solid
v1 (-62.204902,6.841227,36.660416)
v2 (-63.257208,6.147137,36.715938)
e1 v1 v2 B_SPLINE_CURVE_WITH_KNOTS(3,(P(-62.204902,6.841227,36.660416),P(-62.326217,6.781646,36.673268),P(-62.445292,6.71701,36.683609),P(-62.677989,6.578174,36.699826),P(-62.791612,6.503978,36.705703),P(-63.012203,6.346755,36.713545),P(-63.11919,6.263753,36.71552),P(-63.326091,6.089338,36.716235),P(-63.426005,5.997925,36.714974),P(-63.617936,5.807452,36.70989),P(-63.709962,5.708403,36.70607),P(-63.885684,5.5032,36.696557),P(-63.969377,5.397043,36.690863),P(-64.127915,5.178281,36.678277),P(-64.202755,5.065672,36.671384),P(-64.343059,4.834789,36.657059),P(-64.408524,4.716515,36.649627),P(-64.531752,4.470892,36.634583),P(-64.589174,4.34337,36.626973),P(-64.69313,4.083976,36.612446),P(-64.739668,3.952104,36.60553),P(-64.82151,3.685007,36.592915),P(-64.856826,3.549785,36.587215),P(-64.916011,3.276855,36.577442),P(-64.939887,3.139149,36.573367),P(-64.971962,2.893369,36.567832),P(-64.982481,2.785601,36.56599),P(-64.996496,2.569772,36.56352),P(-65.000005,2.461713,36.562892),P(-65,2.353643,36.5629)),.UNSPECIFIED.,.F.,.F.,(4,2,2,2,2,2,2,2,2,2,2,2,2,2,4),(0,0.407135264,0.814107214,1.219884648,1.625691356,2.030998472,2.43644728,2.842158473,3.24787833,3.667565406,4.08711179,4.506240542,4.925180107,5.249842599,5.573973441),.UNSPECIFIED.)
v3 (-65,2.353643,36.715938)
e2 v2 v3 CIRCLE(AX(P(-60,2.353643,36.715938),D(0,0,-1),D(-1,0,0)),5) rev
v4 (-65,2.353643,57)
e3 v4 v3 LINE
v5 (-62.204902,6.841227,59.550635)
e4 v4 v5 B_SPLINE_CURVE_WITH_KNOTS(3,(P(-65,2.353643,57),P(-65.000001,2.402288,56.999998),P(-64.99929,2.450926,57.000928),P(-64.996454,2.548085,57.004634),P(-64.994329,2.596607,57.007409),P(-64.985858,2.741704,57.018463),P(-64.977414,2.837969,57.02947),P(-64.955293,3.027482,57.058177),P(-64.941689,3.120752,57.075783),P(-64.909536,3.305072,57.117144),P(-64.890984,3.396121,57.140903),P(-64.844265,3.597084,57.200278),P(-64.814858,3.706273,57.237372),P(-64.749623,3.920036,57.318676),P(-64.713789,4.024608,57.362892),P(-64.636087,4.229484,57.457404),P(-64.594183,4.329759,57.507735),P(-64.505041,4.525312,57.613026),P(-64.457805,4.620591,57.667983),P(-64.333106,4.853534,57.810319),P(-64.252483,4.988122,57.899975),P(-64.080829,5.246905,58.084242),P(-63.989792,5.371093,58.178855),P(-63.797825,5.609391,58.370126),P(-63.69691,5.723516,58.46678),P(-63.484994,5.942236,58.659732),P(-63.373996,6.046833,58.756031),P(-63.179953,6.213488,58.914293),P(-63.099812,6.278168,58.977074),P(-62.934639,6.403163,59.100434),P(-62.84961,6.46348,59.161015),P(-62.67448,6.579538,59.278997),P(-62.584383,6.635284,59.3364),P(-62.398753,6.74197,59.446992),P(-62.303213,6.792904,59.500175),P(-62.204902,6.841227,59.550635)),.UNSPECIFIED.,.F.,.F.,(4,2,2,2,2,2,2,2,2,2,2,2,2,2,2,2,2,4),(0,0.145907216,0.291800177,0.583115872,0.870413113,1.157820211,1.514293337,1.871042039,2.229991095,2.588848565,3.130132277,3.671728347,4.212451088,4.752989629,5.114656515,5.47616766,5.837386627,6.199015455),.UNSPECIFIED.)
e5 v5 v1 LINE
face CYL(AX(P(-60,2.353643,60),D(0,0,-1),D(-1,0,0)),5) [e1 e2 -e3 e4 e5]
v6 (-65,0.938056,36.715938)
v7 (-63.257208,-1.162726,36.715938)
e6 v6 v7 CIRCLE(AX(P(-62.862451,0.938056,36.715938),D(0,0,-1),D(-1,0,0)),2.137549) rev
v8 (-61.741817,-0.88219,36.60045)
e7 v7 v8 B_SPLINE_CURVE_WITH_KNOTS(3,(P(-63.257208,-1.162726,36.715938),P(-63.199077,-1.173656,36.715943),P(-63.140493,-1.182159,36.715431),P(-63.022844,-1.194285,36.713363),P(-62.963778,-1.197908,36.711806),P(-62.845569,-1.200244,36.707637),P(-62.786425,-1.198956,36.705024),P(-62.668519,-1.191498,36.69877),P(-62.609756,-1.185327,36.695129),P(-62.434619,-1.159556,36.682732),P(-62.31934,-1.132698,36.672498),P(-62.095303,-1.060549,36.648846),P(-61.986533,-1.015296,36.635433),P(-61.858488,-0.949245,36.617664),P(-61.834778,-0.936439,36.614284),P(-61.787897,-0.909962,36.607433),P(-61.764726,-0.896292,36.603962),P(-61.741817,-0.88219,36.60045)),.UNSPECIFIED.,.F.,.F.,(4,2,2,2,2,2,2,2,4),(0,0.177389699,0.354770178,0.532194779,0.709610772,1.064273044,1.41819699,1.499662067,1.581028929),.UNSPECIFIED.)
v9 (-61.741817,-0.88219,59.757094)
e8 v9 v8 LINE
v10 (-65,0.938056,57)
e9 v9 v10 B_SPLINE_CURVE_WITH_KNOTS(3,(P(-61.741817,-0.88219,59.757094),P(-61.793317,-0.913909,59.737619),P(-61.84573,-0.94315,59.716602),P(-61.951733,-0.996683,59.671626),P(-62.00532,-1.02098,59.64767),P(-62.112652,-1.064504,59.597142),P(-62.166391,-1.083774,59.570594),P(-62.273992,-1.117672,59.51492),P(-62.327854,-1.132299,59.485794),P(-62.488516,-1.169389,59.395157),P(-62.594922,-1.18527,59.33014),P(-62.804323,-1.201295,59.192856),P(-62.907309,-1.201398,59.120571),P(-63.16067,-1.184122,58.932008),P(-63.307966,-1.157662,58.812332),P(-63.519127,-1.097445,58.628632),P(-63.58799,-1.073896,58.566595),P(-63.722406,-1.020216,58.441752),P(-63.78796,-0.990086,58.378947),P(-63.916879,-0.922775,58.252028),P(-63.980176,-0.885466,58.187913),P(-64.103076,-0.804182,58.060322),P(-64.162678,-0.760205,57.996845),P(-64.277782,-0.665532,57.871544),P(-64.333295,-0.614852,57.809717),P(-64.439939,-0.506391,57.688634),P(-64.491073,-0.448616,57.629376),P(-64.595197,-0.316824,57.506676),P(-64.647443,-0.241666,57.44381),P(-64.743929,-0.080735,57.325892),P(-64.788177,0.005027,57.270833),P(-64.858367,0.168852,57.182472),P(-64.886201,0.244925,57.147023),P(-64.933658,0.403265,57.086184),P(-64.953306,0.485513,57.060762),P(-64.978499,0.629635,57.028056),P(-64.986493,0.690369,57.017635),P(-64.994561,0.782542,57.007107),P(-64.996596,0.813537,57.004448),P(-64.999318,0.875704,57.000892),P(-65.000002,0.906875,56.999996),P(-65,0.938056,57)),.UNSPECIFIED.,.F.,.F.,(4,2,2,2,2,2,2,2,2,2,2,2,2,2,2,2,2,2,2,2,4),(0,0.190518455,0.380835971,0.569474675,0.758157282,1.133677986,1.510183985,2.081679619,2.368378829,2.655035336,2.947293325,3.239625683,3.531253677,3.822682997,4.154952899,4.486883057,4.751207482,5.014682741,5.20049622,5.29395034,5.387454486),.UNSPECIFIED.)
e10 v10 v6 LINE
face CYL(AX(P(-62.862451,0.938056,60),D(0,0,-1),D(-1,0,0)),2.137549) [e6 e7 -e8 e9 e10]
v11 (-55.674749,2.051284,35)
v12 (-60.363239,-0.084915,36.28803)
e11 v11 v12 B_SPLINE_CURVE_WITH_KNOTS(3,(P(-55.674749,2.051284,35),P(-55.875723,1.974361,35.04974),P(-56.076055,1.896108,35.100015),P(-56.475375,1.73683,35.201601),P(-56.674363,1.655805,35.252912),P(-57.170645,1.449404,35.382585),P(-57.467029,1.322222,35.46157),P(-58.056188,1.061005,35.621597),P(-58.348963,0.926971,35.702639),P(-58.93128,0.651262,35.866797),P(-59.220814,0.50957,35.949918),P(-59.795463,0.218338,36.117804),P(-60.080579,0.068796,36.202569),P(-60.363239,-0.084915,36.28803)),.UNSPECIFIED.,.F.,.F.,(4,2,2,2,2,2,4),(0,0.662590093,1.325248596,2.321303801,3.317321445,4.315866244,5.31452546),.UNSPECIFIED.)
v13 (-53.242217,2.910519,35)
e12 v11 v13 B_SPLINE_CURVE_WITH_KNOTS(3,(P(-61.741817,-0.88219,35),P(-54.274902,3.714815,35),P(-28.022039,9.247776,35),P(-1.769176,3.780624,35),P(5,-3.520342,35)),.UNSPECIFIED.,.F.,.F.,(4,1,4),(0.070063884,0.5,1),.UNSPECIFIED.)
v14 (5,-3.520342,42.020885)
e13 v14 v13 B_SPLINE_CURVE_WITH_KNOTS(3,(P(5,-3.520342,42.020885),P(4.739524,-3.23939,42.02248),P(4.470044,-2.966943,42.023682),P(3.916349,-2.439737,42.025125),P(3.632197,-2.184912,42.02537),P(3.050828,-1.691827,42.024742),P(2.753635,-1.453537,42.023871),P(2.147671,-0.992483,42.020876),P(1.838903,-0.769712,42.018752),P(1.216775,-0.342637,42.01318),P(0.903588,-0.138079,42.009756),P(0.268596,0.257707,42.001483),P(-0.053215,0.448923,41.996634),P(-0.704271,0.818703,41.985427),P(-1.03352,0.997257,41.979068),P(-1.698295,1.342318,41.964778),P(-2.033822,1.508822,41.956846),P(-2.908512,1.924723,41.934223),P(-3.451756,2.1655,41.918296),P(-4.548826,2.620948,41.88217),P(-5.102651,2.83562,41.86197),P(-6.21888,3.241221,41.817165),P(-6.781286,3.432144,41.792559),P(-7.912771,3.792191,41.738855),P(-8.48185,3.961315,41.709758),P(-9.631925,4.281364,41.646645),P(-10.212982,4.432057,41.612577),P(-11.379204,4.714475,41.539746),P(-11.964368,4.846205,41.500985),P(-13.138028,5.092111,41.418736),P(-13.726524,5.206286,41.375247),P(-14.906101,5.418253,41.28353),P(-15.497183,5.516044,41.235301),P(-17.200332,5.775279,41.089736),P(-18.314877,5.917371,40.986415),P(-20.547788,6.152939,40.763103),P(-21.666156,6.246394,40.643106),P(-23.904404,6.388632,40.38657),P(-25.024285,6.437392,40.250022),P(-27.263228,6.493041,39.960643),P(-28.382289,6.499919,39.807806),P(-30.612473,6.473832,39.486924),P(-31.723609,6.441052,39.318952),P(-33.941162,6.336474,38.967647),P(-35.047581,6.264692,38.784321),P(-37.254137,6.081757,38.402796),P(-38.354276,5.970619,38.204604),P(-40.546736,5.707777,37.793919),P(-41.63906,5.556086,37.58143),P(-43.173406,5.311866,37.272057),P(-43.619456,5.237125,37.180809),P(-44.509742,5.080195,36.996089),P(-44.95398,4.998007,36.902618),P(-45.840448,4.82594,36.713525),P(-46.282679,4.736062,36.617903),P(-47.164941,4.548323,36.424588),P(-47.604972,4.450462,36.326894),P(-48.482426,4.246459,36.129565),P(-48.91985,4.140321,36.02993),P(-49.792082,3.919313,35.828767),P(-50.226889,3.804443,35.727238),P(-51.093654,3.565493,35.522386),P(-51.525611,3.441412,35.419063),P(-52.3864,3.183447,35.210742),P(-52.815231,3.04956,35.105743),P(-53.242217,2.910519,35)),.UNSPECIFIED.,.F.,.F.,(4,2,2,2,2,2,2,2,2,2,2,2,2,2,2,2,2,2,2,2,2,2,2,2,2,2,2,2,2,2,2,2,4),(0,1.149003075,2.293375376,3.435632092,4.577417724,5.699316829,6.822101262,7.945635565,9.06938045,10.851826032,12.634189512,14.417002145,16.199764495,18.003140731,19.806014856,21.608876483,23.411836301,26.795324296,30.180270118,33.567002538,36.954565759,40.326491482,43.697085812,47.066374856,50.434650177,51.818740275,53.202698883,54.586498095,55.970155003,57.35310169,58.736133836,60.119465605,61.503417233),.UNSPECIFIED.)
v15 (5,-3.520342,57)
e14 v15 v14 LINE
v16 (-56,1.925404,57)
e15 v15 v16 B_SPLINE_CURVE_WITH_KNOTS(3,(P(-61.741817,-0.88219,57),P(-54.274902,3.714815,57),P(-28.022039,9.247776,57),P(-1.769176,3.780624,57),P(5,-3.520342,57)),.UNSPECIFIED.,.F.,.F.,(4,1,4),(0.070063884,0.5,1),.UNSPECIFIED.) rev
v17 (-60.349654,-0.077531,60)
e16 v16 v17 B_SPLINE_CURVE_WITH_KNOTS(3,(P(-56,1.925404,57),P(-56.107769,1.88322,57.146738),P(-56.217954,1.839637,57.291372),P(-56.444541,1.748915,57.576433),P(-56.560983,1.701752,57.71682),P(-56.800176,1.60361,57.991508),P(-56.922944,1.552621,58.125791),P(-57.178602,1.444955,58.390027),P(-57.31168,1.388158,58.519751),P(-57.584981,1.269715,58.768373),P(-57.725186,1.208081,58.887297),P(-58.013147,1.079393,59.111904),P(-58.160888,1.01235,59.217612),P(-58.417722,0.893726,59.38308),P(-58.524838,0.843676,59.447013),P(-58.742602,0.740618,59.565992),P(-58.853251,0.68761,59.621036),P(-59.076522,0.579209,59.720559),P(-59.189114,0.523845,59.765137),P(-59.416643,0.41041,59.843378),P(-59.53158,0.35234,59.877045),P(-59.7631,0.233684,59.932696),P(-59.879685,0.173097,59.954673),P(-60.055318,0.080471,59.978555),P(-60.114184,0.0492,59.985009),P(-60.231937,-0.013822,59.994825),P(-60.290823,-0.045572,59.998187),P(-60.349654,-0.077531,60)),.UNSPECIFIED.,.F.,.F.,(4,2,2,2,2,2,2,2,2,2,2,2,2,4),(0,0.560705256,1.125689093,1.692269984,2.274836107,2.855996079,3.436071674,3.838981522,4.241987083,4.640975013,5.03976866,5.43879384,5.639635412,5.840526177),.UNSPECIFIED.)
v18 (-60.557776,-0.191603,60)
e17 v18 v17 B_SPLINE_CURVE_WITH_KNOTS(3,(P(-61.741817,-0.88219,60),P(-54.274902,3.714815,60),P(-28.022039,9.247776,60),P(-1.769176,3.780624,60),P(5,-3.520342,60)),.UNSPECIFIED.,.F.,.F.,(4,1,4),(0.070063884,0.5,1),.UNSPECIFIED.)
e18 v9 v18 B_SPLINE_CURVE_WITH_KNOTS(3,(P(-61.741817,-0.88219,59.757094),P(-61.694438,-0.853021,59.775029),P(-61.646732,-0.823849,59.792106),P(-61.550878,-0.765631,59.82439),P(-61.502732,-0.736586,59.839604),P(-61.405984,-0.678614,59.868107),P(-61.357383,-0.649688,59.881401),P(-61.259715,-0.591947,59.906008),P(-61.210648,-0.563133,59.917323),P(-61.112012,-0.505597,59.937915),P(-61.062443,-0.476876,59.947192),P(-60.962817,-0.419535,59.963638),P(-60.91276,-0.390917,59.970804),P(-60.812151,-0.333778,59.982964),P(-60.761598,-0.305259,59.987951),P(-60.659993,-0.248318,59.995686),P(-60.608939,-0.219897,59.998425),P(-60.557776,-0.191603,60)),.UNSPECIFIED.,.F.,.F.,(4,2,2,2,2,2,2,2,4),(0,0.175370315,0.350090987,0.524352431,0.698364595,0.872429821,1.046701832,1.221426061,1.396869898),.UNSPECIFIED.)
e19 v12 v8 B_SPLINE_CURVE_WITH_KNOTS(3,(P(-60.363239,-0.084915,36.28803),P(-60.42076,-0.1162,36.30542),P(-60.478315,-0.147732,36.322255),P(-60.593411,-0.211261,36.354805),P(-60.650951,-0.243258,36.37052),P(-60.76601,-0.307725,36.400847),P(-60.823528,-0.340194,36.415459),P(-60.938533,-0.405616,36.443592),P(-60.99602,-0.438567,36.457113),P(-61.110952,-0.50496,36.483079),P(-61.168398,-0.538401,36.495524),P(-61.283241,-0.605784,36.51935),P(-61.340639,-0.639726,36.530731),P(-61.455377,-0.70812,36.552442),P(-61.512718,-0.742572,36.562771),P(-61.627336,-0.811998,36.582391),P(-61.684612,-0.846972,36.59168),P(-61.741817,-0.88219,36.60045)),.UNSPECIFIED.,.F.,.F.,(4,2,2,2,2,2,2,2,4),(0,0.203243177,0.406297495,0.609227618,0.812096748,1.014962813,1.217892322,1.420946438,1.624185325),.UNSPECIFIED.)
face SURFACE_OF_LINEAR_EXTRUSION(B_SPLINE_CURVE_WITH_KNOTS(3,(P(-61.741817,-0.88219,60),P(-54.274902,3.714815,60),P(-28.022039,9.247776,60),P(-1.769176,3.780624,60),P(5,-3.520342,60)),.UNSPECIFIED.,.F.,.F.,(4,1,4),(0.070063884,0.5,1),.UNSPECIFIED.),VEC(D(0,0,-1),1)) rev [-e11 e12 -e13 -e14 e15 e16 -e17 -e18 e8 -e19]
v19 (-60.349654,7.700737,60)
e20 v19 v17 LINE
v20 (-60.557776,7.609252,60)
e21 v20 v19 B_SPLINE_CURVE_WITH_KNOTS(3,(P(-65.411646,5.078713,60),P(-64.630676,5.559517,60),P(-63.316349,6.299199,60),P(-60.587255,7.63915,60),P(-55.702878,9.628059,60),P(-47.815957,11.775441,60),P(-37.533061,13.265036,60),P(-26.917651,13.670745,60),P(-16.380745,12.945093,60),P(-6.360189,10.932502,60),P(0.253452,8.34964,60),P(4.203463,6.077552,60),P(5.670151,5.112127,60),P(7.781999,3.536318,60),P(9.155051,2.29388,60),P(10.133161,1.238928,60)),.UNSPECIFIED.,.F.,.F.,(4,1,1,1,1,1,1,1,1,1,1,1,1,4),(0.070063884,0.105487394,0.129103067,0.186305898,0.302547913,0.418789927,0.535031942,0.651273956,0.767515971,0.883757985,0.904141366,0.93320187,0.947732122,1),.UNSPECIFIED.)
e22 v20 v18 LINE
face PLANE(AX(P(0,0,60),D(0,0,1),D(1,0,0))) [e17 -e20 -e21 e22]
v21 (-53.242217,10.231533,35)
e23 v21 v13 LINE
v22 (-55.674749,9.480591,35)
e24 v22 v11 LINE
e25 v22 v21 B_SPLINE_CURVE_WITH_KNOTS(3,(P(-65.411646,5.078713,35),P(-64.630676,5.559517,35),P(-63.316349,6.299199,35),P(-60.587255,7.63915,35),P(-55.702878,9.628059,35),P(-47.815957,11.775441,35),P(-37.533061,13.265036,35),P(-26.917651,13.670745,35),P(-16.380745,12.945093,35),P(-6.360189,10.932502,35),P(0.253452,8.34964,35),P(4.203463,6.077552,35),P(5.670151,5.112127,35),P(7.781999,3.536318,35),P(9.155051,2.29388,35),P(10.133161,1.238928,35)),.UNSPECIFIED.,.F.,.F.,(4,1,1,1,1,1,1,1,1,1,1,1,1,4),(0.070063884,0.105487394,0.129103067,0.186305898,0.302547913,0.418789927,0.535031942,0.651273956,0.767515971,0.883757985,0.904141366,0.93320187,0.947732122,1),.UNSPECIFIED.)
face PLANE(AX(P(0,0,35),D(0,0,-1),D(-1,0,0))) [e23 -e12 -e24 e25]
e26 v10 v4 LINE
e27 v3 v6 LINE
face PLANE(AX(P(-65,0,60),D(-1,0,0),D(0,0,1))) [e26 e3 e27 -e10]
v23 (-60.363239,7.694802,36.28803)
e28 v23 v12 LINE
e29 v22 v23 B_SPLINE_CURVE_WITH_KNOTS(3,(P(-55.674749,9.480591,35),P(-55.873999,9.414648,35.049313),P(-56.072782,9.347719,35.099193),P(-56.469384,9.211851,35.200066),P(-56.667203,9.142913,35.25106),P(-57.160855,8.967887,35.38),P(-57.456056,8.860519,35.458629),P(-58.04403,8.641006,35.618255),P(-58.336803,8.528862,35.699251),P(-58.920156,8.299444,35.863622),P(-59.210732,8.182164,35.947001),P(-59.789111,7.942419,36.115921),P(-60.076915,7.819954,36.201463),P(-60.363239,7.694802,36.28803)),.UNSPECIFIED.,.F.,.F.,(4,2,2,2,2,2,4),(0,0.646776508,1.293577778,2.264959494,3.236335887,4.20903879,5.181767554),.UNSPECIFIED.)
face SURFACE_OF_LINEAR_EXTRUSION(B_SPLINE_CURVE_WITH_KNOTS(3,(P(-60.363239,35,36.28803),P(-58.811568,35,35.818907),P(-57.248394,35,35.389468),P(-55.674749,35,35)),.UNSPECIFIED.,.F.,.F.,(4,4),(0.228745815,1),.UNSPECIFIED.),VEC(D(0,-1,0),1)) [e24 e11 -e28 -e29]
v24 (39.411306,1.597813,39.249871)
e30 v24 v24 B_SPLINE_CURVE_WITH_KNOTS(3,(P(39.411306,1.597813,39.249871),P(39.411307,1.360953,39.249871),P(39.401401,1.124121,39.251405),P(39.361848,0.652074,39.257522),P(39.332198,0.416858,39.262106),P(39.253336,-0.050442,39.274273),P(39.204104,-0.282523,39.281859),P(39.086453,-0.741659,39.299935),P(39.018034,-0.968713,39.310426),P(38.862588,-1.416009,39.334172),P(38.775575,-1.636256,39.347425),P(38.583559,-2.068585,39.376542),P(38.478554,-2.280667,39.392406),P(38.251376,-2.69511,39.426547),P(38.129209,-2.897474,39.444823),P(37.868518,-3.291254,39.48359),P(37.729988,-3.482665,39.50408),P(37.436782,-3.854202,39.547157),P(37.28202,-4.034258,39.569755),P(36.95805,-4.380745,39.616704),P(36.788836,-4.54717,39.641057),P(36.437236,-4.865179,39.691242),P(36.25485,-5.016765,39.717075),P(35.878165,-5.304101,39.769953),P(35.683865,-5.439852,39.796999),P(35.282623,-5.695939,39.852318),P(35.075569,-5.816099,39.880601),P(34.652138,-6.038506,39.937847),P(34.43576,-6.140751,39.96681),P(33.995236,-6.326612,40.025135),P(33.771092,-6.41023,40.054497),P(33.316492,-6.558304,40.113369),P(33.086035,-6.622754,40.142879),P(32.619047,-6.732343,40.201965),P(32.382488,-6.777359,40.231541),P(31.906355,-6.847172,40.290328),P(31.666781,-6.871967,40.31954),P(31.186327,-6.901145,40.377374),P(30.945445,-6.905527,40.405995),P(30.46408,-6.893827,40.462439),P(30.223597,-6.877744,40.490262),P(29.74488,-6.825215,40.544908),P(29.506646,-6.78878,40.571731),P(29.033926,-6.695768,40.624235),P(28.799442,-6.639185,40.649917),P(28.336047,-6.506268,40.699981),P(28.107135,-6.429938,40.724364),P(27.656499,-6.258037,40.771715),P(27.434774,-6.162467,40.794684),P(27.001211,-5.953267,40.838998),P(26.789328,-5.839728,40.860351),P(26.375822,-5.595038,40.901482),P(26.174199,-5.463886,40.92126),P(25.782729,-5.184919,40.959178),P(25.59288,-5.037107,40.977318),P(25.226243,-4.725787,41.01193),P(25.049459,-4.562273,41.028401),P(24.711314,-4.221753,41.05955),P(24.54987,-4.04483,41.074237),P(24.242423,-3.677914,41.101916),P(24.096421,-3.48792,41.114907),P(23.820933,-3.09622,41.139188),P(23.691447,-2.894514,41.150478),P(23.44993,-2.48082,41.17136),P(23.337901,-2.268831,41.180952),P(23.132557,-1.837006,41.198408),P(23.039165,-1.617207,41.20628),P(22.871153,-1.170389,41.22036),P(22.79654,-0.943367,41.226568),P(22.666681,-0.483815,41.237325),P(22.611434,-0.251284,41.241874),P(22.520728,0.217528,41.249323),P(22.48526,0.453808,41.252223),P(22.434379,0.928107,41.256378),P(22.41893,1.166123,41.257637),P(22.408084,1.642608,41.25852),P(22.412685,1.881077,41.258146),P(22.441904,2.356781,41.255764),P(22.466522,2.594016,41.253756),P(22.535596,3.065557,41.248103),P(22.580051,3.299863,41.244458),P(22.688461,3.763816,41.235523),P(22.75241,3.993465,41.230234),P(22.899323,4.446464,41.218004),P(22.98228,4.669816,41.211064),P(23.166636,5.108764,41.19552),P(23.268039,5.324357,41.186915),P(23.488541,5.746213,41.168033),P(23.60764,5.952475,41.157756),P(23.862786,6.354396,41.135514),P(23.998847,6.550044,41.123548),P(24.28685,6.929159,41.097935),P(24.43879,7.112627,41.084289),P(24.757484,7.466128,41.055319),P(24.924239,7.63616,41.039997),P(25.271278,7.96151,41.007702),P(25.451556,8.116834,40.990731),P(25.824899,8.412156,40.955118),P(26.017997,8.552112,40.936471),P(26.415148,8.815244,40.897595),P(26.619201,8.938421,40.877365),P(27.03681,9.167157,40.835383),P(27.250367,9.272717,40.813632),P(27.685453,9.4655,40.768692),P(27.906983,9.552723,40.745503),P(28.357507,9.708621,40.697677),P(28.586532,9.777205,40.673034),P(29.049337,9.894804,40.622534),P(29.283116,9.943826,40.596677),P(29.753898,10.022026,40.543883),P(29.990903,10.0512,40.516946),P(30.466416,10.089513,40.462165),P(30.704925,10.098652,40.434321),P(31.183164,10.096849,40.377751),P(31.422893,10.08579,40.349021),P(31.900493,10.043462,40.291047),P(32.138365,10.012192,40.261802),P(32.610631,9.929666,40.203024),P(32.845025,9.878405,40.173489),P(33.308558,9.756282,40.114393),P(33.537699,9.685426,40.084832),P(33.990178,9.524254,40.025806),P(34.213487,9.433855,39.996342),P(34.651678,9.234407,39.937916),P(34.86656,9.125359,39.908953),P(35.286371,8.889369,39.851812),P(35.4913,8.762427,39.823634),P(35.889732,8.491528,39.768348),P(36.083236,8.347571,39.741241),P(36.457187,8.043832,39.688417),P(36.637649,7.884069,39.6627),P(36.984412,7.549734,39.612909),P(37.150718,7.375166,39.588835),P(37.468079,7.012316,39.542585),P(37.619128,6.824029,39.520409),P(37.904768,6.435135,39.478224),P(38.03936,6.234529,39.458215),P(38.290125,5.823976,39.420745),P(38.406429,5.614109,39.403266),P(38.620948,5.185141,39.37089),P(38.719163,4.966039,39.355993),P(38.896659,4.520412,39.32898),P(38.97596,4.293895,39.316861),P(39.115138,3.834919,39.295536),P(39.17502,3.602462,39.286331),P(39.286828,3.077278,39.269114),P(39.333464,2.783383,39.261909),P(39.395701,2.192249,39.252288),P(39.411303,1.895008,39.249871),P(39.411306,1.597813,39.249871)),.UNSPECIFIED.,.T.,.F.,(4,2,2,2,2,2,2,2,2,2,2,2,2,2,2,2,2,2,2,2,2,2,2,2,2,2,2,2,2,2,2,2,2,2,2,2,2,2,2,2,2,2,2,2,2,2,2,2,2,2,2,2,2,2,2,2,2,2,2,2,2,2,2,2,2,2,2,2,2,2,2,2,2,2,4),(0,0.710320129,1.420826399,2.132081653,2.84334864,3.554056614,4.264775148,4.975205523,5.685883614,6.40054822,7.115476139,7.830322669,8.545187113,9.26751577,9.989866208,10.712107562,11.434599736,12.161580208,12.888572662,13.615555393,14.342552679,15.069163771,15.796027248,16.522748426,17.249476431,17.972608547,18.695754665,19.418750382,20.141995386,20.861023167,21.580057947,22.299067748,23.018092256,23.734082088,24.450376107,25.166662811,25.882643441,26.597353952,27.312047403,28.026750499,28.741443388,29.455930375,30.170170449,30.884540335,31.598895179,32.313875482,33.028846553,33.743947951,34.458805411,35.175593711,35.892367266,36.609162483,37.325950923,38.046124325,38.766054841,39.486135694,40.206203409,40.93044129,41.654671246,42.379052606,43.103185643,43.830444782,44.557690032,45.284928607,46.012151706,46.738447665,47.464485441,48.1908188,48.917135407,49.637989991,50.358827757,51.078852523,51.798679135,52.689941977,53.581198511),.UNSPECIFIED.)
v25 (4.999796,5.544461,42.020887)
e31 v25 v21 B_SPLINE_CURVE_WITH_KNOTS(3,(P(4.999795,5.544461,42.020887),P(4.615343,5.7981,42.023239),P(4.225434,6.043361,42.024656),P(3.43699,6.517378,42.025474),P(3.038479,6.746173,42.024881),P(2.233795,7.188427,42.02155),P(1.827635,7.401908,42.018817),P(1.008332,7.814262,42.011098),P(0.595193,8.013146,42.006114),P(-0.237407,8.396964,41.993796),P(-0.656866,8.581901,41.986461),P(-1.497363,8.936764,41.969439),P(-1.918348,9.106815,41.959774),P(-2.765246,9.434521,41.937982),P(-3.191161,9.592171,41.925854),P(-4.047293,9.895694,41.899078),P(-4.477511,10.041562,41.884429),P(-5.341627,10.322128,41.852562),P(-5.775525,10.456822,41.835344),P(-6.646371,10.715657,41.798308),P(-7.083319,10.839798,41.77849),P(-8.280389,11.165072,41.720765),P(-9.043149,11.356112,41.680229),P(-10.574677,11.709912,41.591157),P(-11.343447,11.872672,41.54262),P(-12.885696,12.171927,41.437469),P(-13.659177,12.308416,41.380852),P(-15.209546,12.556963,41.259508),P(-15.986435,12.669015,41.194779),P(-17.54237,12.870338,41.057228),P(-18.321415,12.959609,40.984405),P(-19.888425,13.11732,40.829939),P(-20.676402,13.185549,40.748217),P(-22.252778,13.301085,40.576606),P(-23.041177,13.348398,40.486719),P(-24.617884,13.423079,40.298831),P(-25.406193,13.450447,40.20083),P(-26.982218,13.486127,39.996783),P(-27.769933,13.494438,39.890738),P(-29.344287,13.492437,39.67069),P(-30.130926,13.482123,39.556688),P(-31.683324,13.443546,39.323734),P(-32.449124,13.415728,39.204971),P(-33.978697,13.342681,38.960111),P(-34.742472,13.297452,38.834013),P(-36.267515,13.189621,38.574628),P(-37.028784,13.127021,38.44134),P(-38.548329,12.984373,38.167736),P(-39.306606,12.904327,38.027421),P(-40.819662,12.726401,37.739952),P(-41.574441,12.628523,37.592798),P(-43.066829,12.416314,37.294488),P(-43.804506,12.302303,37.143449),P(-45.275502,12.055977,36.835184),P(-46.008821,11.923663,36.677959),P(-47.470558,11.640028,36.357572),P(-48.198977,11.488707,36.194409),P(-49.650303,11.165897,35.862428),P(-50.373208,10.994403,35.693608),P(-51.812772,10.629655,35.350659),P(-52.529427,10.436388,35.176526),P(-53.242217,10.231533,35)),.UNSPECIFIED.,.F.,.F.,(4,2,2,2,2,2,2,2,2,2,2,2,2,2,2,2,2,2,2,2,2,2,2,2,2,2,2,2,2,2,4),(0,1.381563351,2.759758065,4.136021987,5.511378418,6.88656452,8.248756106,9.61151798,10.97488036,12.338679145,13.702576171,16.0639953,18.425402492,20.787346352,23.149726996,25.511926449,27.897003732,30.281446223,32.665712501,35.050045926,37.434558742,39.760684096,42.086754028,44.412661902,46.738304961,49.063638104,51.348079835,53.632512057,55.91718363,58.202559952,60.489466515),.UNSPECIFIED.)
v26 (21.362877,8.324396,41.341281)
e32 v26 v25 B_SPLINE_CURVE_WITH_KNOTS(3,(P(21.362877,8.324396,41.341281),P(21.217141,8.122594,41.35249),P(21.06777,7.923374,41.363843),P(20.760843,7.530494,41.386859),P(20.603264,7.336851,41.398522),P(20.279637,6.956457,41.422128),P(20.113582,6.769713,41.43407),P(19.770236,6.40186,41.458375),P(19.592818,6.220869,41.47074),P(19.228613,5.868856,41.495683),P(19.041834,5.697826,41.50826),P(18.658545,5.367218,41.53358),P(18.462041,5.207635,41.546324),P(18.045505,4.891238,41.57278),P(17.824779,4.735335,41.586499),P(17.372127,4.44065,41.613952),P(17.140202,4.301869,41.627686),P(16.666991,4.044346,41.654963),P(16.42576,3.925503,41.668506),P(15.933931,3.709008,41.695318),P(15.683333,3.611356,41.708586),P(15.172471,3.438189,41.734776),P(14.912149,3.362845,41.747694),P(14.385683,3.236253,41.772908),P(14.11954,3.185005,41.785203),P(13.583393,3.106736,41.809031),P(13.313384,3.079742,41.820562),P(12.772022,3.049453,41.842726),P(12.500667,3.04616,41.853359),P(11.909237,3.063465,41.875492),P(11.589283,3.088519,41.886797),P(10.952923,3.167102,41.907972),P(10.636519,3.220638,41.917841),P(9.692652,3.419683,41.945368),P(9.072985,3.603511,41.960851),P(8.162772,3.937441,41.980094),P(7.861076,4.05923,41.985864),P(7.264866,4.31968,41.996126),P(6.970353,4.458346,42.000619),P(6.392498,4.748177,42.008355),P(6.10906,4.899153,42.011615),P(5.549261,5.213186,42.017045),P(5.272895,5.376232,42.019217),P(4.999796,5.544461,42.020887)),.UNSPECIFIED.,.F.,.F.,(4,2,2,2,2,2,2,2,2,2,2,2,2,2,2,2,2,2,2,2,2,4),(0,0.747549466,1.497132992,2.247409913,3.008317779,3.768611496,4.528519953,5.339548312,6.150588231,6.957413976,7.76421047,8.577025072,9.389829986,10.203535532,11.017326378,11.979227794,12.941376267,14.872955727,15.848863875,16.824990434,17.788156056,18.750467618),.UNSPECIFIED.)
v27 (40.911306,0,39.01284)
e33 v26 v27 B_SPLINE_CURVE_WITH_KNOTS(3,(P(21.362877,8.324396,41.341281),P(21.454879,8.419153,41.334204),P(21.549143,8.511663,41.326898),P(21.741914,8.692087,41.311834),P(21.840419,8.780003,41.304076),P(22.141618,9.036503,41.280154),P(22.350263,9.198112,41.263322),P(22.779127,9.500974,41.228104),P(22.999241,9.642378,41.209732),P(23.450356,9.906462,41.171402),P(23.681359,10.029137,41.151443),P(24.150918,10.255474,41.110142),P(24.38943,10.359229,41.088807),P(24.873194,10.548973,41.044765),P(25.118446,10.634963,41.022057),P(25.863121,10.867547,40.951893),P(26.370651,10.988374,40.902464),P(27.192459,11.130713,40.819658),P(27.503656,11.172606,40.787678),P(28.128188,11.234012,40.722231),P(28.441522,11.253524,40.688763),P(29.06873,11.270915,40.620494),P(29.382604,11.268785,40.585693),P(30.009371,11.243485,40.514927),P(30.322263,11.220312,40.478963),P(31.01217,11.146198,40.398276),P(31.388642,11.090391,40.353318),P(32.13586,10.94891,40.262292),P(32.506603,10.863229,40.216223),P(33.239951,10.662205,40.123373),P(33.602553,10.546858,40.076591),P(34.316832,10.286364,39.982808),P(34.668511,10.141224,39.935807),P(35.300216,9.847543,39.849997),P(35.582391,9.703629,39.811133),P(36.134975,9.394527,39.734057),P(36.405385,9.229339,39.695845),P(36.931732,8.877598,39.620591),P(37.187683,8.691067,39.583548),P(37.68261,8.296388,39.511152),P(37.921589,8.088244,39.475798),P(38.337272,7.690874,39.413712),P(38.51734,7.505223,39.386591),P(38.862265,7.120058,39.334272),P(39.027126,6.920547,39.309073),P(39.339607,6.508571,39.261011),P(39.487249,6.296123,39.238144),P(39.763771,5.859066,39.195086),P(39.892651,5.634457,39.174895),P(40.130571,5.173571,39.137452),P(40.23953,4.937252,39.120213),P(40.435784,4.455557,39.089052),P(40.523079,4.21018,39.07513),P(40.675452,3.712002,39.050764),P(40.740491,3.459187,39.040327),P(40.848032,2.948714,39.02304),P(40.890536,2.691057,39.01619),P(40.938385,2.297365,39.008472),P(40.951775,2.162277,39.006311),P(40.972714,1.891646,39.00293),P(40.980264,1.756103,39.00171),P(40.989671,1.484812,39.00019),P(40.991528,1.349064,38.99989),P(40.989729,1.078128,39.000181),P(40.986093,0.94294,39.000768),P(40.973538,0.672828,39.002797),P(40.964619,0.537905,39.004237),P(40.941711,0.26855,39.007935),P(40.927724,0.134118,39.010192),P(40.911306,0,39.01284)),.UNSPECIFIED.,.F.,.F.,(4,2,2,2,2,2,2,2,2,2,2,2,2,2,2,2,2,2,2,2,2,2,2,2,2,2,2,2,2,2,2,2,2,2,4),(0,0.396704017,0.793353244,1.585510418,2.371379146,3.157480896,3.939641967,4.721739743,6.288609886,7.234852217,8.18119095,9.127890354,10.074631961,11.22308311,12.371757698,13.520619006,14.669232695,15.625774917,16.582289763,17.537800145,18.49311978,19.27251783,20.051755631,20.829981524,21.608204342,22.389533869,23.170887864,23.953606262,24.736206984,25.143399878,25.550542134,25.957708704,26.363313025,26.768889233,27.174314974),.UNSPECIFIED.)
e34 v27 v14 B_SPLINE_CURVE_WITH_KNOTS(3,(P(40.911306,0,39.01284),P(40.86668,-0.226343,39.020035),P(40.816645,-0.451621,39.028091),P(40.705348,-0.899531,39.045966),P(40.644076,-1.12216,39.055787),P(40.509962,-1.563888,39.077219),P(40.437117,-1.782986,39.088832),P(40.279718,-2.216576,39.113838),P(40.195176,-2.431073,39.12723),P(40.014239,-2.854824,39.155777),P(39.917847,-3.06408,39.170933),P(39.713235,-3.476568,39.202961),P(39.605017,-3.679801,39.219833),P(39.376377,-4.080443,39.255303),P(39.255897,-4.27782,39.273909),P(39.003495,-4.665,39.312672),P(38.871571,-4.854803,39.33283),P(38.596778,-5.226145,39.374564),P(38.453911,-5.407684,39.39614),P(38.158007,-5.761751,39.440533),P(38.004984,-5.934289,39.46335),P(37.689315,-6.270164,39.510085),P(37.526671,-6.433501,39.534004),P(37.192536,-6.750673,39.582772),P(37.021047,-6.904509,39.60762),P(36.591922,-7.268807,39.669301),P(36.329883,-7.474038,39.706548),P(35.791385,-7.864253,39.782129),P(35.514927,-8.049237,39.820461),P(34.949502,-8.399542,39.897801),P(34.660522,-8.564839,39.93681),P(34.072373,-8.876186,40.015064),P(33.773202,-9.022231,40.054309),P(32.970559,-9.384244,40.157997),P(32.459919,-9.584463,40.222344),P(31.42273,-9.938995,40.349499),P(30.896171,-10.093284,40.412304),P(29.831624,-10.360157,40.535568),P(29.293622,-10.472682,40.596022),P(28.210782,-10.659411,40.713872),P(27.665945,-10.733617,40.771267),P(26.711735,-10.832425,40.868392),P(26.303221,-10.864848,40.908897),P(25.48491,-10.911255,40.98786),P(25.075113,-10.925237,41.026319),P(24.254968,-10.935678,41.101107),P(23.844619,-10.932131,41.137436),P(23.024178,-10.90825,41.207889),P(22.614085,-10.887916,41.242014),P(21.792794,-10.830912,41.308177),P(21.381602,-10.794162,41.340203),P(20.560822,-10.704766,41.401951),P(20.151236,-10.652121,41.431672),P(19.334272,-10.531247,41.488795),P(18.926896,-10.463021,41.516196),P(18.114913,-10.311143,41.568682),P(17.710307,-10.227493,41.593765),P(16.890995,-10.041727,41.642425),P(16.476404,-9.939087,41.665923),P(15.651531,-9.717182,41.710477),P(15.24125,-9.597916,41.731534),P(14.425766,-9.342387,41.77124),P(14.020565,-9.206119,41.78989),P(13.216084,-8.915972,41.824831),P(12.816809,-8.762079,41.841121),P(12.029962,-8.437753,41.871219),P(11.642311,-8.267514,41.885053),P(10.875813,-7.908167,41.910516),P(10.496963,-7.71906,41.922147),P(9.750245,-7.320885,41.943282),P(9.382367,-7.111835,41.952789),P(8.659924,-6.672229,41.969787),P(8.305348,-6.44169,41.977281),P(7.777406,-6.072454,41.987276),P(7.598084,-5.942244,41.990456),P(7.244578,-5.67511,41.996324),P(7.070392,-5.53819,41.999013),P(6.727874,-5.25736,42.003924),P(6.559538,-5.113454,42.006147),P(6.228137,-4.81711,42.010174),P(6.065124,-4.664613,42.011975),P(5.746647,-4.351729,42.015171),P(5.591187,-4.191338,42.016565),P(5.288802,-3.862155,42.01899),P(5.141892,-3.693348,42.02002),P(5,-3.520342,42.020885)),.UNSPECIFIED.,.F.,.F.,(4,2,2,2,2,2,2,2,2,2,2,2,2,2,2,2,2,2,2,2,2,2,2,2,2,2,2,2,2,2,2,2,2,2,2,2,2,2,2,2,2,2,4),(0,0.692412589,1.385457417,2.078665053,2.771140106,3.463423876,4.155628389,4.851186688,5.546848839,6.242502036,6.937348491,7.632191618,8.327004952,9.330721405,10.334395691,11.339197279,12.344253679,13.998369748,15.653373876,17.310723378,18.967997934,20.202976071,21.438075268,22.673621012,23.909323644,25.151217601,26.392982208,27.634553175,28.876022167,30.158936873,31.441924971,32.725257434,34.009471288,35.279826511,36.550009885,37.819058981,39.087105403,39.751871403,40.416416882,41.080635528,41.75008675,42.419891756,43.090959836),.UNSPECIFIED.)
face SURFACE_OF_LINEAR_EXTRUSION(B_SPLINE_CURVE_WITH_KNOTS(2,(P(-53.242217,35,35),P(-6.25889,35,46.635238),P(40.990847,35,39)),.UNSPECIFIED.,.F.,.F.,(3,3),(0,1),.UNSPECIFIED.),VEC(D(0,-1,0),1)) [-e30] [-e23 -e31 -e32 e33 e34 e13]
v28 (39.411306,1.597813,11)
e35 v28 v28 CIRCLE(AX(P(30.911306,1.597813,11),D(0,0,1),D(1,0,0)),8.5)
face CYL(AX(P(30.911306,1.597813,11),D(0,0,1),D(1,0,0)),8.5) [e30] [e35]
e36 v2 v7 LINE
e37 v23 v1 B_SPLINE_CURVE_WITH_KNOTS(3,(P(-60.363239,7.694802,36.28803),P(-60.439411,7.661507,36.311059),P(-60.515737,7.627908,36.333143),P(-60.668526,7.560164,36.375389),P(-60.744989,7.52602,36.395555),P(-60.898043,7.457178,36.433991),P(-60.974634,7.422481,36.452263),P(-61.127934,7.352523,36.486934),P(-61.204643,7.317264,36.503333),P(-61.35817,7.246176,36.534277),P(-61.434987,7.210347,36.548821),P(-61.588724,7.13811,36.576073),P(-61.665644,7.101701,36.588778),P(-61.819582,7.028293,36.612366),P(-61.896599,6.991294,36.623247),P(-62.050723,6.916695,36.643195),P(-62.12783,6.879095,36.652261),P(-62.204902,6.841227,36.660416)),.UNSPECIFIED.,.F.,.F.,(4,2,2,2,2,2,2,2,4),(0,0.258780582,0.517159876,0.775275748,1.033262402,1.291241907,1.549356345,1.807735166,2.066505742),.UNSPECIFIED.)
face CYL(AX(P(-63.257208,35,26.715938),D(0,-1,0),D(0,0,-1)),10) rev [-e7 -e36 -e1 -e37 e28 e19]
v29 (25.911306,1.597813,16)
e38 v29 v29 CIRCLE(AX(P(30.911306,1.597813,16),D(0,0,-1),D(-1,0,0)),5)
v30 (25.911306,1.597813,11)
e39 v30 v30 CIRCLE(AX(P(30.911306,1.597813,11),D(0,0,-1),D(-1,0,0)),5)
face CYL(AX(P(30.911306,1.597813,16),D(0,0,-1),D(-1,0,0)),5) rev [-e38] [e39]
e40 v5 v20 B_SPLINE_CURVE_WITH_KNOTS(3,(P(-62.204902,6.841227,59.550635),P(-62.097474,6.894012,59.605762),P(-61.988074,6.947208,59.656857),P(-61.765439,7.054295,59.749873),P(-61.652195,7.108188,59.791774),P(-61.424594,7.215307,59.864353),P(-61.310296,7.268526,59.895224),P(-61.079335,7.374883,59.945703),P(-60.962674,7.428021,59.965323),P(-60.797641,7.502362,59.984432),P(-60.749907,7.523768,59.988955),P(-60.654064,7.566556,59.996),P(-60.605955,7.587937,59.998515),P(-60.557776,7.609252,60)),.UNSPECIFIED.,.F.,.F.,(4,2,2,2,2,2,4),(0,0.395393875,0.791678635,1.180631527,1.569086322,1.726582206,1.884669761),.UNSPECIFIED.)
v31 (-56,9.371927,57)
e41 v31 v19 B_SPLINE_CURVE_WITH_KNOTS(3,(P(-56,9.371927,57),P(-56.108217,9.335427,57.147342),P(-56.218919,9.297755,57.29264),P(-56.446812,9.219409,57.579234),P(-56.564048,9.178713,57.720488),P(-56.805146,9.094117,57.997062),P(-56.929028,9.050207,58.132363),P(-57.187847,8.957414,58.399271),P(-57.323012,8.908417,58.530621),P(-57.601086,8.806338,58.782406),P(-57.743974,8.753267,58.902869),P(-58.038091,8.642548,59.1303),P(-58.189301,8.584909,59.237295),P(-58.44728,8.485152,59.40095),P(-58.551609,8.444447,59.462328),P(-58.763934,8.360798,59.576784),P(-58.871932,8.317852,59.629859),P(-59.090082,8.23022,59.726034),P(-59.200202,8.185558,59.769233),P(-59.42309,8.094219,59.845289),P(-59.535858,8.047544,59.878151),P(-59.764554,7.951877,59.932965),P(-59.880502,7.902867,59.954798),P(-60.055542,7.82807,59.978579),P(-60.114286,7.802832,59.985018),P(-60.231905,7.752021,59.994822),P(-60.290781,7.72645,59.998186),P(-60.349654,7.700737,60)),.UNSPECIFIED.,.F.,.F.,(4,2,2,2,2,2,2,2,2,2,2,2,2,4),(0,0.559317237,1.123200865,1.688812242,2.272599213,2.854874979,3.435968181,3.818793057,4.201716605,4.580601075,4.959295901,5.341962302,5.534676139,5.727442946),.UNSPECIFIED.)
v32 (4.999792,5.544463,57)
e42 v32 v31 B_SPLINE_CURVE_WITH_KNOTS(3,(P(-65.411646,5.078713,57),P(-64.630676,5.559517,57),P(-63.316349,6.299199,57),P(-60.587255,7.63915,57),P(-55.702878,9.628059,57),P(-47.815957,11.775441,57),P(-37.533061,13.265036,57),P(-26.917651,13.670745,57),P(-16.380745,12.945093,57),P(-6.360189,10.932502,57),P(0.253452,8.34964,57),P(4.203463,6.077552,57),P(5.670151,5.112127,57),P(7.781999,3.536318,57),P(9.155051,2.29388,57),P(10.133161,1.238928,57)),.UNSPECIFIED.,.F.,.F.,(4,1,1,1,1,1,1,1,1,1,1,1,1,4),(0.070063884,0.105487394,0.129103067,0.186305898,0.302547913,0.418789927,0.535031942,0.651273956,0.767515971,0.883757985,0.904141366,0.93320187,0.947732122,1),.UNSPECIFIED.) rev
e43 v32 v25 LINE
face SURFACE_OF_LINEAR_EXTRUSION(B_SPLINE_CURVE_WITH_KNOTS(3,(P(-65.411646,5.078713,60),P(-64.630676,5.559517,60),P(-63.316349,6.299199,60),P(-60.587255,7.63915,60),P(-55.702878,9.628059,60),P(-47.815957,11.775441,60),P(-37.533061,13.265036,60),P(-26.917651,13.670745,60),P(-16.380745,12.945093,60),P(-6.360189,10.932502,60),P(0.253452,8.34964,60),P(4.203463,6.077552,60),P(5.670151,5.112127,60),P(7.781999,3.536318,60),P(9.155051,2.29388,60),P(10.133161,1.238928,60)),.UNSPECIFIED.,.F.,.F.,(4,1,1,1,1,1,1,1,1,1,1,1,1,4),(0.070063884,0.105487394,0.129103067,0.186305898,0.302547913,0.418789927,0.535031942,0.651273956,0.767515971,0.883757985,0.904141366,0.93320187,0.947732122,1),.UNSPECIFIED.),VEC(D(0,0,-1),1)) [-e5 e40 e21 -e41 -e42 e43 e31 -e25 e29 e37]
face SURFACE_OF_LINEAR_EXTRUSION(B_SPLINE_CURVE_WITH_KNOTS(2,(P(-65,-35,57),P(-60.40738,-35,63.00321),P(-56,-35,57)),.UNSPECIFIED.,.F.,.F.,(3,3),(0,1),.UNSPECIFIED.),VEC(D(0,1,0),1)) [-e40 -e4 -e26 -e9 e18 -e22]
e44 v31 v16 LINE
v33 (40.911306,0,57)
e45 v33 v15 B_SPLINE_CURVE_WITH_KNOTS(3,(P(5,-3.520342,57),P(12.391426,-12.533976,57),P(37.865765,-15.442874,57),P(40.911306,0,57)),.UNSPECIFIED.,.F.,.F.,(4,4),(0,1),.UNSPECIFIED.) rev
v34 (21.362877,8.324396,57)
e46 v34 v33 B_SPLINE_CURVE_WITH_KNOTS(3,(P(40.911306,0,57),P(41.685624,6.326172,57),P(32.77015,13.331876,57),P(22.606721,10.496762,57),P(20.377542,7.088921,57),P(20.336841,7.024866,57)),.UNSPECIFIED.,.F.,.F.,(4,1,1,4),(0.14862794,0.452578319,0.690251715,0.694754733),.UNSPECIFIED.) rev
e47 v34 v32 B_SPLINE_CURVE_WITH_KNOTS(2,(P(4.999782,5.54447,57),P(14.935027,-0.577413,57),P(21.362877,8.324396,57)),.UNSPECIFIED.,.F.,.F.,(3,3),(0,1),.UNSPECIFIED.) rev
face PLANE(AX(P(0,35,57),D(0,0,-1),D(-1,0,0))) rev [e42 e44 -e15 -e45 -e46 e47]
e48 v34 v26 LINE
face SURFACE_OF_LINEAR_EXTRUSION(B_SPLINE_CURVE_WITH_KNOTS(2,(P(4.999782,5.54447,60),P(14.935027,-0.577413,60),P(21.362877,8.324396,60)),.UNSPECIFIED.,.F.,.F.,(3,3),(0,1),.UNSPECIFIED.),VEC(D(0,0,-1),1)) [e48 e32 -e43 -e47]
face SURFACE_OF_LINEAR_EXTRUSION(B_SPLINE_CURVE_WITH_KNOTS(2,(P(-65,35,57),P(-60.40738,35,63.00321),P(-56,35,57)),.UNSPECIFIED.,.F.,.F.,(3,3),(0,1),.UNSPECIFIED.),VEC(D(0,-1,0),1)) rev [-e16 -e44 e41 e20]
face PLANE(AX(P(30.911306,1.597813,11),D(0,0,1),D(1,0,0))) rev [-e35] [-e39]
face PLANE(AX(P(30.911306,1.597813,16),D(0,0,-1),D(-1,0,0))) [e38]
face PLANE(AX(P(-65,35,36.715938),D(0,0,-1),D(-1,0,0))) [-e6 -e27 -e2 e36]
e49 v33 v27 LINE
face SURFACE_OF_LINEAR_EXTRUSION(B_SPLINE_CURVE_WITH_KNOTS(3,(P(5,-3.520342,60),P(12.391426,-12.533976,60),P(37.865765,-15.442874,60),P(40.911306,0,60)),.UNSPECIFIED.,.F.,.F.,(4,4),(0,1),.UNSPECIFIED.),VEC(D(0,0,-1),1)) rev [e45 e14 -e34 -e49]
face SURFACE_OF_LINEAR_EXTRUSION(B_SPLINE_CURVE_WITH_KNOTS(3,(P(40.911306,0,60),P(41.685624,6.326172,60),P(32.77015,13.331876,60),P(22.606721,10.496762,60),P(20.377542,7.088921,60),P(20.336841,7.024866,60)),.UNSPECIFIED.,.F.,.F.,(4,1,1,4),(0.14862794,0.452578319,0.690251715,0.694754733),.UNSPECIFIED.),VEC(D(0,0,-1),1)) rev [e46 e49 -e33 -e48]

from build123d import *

# Parameters (mm, degrees)
SKETCH_1_W               = 140
SKETCH_1_H               = 40
EXTRUDE_1_DEPTH          = 35
EXTRUDE_2_DEPTH          = 25
SKETCH_3_W               = 140
SKETCH_3_H               = 40
CUT_EXTRUDE_1_DEPTH      = 35
CUT_EXTRUDE_3_DEPTH      = 35
CUT_EXTRUDE_3_DEPTH_BACK = 35
CUT_EXTRUDE_4_DEPTH      = 35
CUT_EXTRUDE_4_DEPTH_BACK = 35
SKETCH_7_R               = 8.5
EXTRUDE_3_DEPTH          = 46
SKETCH_8_R               = 5
CUT_EXTRUDE_5_DEPTH      = 5


# Read off the part's stored shape, not the designer's step: 凸台-拉伸2
with BuildPart() as part:
    # 草图1 → 凸台-拉伸1 (new body)
    with BuildSketch(Plane.XY):
        Rectangle(SKETCH_1_W, SKETCH_1_H)
    extrude(amount=EXTRUDE_1_DEPTH)

    # 凸台-拉伸2 outline → 凸台-拉伸2 (add)
    with BuildSketch(Plane.XY.offset(35)):
        with BuildLine():
            add(Edge.make_bspline(
                [(4.99979571, 5.544461103), (14.93503193, -0.57740686), (21.362876996, 8.324395915)],
                knots=[6.93e-07, 6.93e-07, 6.93e-07, 1, 1, 1], degree=2))
            add(Edge.make_bspline(
                [(-62.204901581, 6.84122677), (-61.92798769, 6.977283921), (-60.294583456, 7.758325304), (-55.702877861, 9.628058542), (-47.815957259, 11.775440787), (-37.533060807, 13.26503558), (-26.917650518, 13.670745136), (-16.380744799, 12.945092857), (-6.360189442, 10.9325016), (0.253451635, 8.349640422), (3.857061157, 6.27680637), (4.666883474, 5.764061136), (4.99979571, 5.544461103)],
                knots=[0.117295231, 0.117295231, 0.117295231, 0.117295231, 0.129103067, 0.186305898, 0.302547913, 0.418789927, 0.535031942, 0.651273956, 0.767515971, 0.883757985, 0.904141366, 0.918671815, 0.918671815, 0.918671815, 0.918671815], degree=3))
            ThreePointArc((-62.204901581, 6.84122677), (-64.244084584, 4.997077414), (-65, 2.353642897))
            Line((-65, 2.353642897), (-65, 0.938055763))
            ThreePointArc((-65, 0.938055763), (-63.904973445, -0.928026304), (-61.741817309, -0.882190007))
            add(Edge.make_bspline(
                [(-61.741817309, -0.882190007), (-54.274901725, 3.714814791), (-28.022038825, 9.247775757), (-1.769175925, 3.780623693), (5, -3.520342201)],
                knots=[0.070063884, 0.070063884, 0.070063884, 0.070063884, 0.5, 1, 1, 1, 1], degree=3))
            add(Edge.make_bspline(
                [(5, -3.520342201), (12.391425527, -12.533975981), (37.865765315, -15.442874495), (40.911305501, 0)],
                knots=[0, 0, 0, 0, 1, 1, 1, 1], degree=3))
            add(Edge.make_bspline(
                [(40.911305501, 0), (41.685623973, 6.326172477), (33.243695942, 12.959768139), (23.757997073, 10.791133007), (21.362876996, 8.324395915)],
                knots=[0.14862794, 0.14862794, 0.14862794, 0.14862794, 0.452578319, 0.661483353, 0.661483353, 0.661483353, 0.661483353], degree=3))
        make_face()
    extrude(amount=EXTRUDE_2_DEPTH)

    # 草图3 → 切除-拉伸1 (cut)
    with BuildSketch(Plane(origin=(0, 0, 0), x_dir=(-1, 0, 0), z_dir=(0, 0, -1))):
        Rectangle(SKETCH_3_W, SKETCH_3_H)
    extrude(amount=-CUT_EXTRUDE_1_DEPTH, mode=Mode.SUBTRACT)

    # 草图4 → 切除-拉伸3 (cut, two sides: drawn at the far end of the back side and taken through both)
    with BuildSketch(Plane(origin=(0, 0, 0), x_dir=(1, 0, 0), z_dir=(0, 1, 0)).offset(-CUT_EXTRUDE_3_DEPTH_BACK)):
        with BuildLine():
            Line((40.990847483, -57), (-56, -57))
            add(Edge.make_bspline(
                [(-60.349653835, -60), (-58.152730496, -59.93219396), (-56, -57)],
                knots=[0.511562339, 0.511562339, 0.511562339, 1, 1, 1], degree=2))
            Line((-60.349653835, -60), (40.990847483, -60))
            Line((40.990847483, -60), (40.990847483, -57))
        make_face()
        with BuildLine():
            Line((-65, -60), (-60.557775934, -60))
            add(Edge.make_bspline(
                [(-65, -57), (-62.756791546, -59.93219396), (-60.557775934, -60)],
                knots=[0, 0, 0, 0.488437661, 0.488437661, 0.488437661], degree=2))
            Line((-65, -57), (-65, -60))
        make_face()
    extrude(amount=CUT_EXTRUDE_3_DEPTH + CUT_EXTRUDE_3_DEPTH_BACK, mode=Mode.SUBTRACT)

    # 草图6 → 切除-拉伸4 (cut, two sides: drawn at the far end of the back side and taken through both)
    with BuildSketch(Plane(origin=(0, 0, 0), x_dir=(1, 0, 0), z_dir=(0, 1, 0)).offset(-CUT_EXTRUDE_4_DEPTH_BACK)):
        with BuildLine():
            Line((40.990847483, -35), (21.362876991, -35))
            Line((21.362876991, -35), (-53.242217102, -35))
            add(Edge.make_bspline(
                [(40.990847483, -39), (-6.258890193, -46.635238136), (-53.242217102, -35)],
                knots=[0, 0, 0, 1, 1, 1], degree=2))
            Line((40.990847483, -39), (40.990847483, -35))
        make_face()
        with BuildLine():
            Line((-65, -36.715937701), (-63.25720797, -36.715937701))
            ThreePointArc((-63.25720797, -36.715937701), (-61.794491028, -36.60838225), (-60.363238722, -36.288029531))
            add(Edge.make_bspline(
                [(-60.363238722, -36.288029531), (-58.81156844, -35.818906777), (-57.248394022, -35.38946773), (-55.674749287, -35)],
                knots=[0.228745815, 0.228745815, 0.228745815, 0.228745815, 1, 1, 1, 1], degree=3))
            Line((-55.674749287, -35), (-65, -35))
            Line((-65, -35), (-65, -36.715937701))
        make_face()
    extrude(amount=CUT_EXTRUDE_4_DEPTH + CUT_EXTRUDE_4_DEPTH_BACK, mode=Mode.SUBTRACT)

    # 草图7 → 凸台-拉伸3 (add)
    with BuildSketch(Plane.XY.offset(57)):
        with Locations((30.911305501, 1.597813248)):
            Circle(SKETCH_7_R)
    extrude(amount=-EXTRUDE_3_DEPTH)

    # 草图8 → 切除-拉伸5 (cut)
    with BuildSketch(Plane(origin=(0, 0, 11), x_dir=(-1, 0, 0), z_dir=(0, 0, -1))):
        with Locations((-30.911305501, 1.597813248)):
            Circle(SKETCH_8_R)
    extrude(amount=-CUT_EXTRUDE_5_DEPTH, mode=Mode.SUBTRACT)


solid = part.part
